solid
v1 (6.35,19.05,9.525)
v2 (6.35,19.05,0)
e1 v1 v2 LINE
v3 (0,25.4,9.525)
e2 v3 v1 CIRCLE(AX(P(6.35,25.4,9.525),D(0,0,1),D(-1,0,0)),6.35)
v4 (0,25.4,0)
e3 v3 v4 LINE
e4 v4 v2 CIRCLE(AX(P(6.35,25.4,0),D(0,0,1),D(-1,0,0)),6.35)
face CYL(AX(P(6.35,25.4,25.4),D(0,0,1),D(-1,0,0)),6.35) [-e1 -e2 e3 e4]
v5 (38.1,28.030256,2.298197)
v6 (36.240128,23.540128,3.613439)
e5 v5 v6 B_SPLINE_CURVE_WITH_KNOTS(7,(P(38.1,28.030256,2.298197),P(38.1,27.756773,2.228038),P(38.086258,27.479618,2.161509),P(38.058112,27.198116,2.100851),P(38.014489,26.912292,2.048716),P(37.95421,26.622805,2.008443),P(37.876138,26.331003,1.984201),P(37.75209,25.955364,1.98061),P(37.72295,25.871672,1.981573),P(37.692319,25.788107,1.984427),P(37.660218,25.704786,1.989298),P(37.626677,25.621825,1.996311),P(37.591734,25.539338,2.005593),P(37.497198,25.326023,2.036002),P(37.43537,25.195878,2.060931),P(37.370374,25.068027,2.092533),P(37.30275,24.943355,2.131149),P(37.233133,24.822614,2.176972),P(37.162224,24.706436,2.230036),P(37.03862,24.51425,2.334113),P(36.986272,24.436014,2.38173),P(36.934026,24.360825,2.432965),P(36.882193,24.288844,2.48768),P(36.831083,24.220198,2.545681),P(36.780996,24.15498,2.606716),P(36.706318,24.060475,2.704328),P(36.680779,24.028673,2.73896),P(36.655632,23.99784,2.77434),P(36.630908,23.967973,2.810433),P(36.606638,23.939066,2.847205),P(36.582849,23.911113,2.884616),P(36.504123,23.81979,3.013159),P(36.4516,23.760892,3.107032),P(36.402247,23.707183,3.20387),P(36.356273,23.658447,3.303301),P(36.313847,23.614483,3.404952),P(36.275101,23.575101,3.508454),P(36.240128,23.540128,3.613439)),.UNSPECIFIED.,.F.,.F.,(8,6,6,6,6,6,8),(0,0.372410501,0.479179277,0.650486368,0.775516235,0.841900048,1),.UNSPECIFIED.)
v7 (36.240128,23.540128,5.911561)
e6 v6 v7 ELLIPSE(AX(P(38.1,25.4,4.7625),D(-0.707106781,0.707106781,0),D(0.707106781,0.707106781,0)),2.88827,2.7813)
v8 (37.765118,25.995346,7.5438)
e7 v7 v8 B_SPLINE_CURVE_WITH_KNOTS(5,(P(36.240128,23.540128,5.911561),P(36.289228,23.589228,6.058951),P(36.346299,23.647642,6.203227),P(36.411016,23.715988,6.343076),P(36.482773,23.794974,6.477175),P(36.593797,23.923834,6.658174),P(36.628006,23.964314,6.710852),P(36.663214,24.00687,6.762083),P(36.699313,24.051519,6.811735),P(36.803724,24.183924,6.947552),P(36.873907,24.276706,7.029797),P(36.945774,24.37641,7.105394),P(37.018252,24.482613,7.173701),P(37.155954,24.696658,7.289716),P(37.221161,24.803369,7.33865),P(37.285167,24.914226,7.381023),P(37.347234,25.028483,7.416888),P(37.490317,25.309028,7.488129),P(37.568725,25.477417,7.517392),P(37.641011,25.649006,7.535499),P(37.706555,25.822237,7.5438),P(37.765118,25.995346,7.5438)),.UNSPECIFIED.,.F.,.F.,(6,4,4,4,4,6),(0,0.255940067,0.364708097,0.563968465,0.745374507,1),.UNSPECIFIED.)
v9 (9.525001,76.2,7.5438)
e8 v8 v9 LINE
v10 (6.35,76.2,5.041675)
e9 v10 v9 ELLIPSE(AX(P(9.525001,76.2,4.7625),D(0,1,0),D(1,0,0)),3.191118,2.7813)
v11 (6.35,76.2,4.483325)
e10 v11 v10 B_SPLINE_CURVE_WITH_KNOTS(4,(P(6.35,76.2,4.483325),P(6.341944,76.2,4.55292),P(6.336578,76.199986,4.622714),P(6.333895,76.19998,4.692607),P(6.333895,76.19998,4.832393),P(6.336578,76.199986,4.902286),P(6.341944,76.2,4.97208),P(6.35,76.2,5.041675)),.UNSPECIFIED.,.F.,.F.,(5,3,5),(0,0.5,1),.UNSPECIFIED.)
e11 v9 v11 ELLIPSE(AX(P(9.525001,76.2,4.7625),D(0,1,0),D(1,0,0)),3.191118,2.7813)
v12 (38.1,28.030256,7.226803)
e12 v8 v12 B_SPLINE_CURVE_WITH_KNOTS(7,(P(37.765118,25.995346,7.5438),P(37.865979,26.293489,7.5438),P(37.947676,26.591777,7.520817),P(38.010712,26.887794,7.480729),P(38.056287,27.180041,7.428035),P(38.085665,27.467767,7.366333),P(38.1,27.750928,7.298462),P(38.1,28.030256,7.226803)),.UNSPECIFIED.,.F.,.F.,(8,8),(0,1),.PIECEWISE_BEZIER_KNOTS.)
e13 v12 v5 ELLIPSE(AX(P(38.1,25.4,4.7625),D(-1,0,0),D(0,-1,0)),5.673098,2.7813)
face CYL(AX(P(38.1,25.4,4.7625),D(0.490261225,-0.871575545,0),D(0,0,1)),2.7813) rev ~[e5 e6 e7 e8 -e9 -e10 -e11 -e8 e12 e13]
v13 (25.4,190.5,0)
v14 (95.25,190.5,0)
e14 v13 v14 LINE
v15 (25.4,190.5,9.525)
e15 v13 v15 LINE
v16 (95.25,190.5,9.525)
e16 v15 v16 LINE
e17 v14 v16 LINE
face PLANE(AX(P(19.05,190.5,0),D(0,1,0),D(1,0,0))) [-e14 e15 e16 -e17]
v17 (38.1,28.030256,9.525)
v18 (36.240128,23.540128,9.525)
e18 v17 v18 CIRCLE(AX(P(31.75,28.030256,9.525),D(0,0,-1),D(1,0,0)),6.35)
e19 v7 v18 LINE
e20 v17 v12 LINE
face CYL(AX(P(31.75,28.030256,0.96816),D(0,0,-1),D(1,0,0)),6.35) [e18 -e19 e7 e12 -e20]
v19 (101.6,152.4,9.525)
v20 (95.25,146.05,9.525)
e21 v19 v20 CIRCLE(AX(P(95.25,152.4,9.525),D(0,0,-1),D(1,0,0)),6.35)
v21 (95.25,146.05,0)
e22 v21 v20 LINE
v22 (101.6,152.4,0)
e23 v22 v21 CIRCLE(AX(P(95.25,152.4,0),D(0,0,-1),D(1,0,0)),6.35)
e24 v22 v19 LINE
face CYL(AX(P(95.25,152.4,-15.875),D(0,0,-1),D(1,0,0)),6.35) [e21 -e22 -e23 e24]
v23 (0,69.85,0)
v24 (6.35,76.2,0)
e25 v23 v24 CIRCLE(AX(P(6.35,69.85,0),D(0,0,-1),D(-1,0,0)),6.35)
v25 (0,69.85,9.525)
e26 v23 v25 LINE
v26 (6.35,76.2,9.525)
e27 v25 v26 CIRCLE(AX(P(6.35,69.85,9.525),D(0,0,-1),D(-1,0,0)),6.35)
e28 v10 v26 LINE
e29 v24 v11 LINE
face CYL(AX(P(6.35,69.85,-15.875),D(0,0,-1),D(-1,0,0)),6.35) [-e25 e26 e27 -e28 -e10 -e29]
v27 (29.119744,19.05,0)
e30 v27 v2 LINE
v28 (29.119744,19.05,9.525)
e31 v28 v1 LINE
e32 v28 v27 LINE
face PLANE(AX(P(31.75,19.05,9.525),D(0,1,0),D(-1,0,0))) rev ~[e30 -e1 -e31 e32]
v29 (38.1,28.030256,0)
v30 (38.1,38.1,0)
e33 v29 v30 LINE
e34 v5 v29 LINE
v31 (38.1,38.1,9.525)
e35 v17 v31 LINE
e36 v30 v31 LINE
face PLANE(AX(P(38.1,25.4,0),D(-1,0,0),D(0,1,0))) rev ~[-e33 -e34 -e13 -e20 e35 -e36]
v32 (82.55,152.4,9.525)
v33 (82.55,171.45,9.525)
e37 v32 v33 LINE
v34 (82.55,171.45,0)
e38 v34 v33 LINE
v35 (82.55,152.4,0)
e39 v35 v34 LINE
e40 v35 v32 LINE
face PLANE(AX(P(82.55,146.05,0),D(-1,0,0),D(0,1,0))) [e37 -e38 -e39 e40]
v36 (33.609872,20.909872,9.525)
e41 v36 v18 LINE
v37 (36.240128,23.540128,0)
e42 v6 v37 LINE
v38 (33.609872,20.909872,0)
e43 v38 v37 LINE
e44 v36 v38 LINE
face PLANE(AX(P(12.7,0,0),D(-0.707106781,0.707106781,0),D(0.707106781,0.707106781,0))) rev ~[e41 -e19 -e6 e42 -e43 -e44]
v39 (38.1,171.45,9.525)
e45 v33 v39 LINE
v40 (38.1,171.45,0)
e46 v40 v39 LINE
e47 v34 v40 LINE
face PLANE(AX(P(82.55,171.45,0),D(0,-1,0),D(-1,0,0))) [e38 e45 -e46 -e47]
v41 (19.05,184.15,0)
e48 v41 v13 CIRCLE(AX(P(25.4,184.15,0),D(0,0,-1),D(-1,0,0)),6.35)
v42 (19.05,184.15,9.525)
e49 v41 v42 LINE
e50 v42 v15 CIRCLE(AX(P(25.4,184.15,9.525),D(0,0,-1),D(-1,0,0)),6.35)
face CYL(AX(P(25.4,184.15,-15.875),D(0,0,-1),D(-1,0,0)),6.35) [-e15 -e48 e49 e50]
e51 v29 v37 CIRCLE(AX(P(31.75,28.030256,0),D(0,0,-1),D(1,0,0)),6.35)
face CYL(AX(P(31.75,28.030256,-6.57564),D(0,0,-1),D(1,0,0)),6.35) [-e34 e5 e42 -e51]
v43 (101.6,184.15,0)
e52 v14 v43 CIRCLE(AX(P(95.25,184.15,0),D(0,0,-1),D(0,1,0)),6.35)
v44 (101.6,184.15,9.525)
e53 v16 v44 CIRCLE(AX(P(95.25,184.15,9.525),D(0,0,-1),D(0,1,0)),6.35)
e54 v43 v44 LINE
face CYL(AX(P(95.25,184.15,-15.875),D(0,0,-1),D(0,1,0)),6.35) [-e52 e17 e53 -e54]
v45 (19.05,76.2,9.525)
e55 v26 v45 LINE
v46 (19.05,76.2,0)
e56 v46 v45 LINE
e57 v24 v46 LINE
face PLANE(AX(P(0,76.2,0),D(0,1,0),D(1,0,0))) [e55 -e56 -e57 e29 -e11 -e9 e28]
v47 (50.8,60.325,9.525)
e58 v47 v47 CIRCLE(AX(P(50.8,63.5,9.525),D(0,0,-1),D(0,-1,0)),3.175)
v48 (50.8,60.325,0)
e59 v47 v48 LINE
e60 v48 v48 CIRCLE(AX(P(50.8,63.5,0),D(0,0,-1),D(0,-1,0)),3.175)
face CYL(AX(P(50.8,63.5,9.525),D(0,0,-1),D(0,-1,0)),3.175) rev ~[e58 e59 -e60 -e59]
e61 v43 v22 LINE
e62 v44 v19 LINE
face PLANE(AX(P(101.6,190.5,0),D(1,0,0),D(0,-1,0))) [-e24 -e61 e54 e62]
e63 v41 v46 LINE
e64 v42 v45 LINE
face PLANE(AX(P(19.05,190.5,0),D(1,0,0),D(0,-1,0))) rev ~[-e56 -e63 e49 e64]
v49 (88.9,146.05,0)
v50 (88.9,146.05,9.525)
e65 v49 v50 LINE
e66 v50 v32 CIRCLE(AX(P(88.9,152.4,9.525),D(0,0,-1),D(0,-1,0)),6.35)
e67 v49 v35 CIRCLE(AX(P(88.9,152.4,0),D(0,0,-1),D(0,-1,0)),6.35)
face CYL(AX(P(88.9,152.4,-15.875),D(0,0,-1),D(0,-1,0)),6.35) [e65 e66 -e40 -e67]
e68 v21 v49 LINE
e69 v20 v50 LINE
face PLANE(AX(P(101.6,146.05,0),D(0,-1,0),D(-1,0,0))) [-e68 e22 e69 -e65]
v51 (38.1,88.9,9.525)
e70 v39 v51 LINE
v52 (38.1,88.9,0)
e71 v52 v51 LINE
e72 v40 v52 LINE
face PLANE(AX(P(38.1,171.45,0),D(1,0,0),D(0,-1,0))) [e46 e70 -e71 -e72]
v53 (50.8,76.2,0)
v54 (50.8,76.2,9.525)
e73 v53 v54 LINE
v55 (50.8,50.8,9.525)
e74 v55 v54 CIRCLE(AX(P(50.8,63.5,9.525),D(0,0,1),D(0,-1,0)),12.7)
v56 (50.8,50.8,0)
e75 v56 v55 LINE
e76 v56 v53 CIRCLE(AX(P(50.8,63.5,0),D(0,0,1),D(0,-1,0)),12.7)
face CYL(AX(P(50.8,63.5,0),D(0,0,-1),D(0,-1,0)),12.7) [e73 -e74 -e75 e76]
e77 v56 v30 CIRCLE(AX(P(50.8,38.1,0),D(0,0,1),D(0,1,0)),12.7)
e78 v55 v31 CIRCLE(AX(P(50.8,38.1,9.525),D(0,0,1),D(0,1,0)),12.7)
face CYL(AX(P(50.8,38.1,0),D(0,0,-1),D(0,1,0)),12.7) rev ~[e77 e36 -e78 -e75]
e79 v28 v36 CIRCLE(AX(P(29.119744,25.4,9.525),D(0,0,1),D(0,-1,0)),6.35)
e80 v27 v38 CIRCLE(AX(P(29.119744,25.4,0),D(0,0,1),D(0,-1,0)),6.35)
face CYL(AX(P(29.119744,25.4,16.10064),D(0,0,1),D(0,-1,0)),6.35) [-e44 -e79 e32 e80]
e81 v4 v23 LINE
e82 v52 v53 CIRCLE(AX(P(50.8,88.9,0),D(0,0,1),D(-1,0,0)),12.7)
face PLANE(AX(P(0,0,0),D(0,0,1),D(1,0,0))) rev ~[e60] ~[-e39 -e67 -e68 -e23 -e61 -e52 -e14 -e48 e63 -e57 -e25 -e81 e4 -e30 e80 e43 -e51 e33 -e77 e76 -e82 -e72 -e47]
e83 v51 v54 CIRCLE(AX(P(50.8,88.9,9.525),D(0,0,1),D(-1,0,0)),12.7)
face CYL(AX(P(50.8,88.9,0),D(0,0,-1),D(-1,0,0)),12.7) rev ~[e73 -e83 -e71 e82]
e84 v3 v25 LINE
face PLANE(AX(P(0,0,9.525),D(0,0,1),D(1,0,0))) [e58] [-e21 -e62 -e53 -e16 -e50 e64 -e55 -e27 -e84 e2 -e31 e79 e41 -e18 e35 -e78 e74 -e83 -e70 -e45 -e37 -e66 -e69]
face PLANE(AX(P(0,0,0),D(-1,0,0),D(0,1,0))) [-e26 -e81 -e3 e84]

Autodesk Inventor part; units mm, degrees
ref_plane "YZ Plane" through (0, 0, 0) normal (1, 0, 0) x (0, 1, 0)
ref_plane "XZ Plane" through (0, 0, 0) normal (0, 1, 0) x (-1, 0, 0)
sketch "Sketch1" plane through (0, 0, 0) normal (0, 0, 1) x (1, 0, 0)
  line L0 (0, 0) -> (12.7, 0)
  line L1 (12.7, 0) -> (38.1, 25.4)
  line L2 (38.1, 25.4) -> (38.1, 38.1)
  arc A0 (50.8, 50.8) -> (38.1, 38.1) centre (50.8, 38.1) ccw
  line L3 (0, 0) -> (0, 76.2)
  line L4 (0, 76.2) -> (19.05, 76.2)
  line L5 (19.05, 190.5) -> (19.05, 76.2)
  line L6 (38.1, 171.45) -> (38.1, 88.9)
  arc A1 (50.8, 50.8) -> (50.8, 76.2) centre (50.8, 63.5) ccw
  arc A2 (38.1, 88.9) -> (50.8, 76.2) centre (50.8, 88.9) ccw
  line L7 (19.05, 190.5) -> (101.6, 190.5)
  line L8 (82.55, 171.45) -> (38.1, 171.45)
  line L9 (101.6, 190.5) -> (101.6, 146.05)
  line L10 (101.6, 146.05) -> (82.55, 146.05)
  line L11 (82.55, 146.05) -> (82.55, 171.45)
  dimension "d1" = 25.4
  dimension "d2" = 25.4
  dimension "d3" = 12.7
  dimension "d38" = 76.2
  dimension "d41" = 38.1
  dimension "d84" = 12.7
  dimension "d85" = 12.7
  dimension "d87" = 0
  dimension "d88" = 12.7
  dimension "d90" = 19.05
  dimension "d100" = 19.05
  dimension "d101" = 19.05
  dimension "d102" = 19.05
  dimension "d103" = 107.95
  dimension "d104" = 44.45
  dimension "d105" = 25.4
extrude "Extrusion1" add sketch "Sketch1" along normal blind 9.525
sketch "Sketch3" plane through (0, 0, 9.525) normal (0, 0, 1) x (1, 0, 0)
  line L0 (0, 76.2) -> (0, 0) projected
  line L1 (0, 0) -> (12.7, 0) projected
  arc A0 (50.8, 50.8) -> (38.1, 38.1) centre (50.8, 38.1) ccw projected
  line L2 (19.05, 76.2) -> (0, 76.2) projected
  point P0 (50.8, 63.5)
  point P1 (49.53, 54.61)
  point P2 (12.7, 82.55)
  dimension "d39" = 0
  dimension "d40" = 12.7
hole "Hole2" at (50.8, 63.5, 9.525) direction (0, 0, -1) diameter 6.35 end through all
sketch "Sketch7" plane through (0, 76.2, 0) normal (0, 1, 0) x (1, 0, 0)
  line L0 (0, 0) -> (0, -9.525) projected
  point P0 (9.525, -4.7625)
  dimension "d77" = 9.525
ref_plane "Work Plane6" through (38.1, 25.4, 0) normal (-0.4902612, 0.8715755, 0) x (0, 0, 1)
ref_plane "Work Plane5" through (38.1, 25.4, 4.7625) normal (0.8715755, 0.4902612, 0) x (-0.4902612, 0.8715755, 0)
sketch "Sketch8" plane through (38.1, 25.4, 0) normal (-0.4902612, 0.8715755, 0) x (0, 0, 1)
  line L0 (0, 0) -> (9.525, 0) projected
  circle A0 centre (4.7625, 0) radius 2.7813
  point P0 (0, -45.6597)
  dimension "d79" = 5.5626
extrude "Extrusion3" cut sketch "Sketch8" along normal through all both and the other way through all
sketch "Sketch10" plane through (0, 0, 9.525) normal (0, 0, 1) x (1, 0, 0)
  circle A0 centre (50.8, 63.5) radius 3.175 projected
  line L0 (0, 0) -> (12.7, 0) projected
  line L1 (12.7, 0) -> (38.1, 25.4) projected
  line L2 (38.1, 25.4) -> (38.1, 38.1) projected
  arc A1 (50.8, 50.8) -> (38.1, 38.1) centre (50.8, 38.1) ccw projected
  arc A2 (50.8, 50.8) -> (50.8, 76.2) centre (50.8, 63.5) ccw projected
  arc A3 (38.1, 88.9) -> (50.8, 76.2) centre (50.8, 88.9) ccw projected
  line L3 (38.1, 88.9) -> (38.1, 171.45) projected
  line L4 (19.05, 190.5) -> (19.05, 76.2) projected
  line L5 (19.05, 76.2) -> (0, 76.2) projected
  line L6 (0, 76.2) -> (0, 0) projected
  line L7 (12.7, 0) -> (38.1, 25.4) projected
  line L8 (31.75, 19.05) -> (0, 19.05)
  line L9 (38.1, 171.45) -> (82.55, 171.45) projected
  line L10 (82.55, 171.45) -> (82.55, 146.05) projected
  line L11 (82.55, 146.05) -> (101.6, 146.05) projected
  line L12 (101.6, 146.05) -> (101.6, 190.5) projected
  line L13 (101.6, 190.5) -> (19.05, 190.5) projected
  dimension "d95" = 6.35
extrude "Extrusion5" cut sketch "Sketch10" against normal through all contours L6 L8 L1 L0
fillet "Fillet6" radius 6.35 9 edges at (0, 76.2, 4.7625) (0, 19.05, 4.7625) (31.75, 19.05, 4.7625) (38.1, 25.4, 8.5344) (38.1, 25.4, 0.9906) (19.05, 190.5, 4.7625) (101.6, 190.5, 4.7625) (82.55, 146.05, 4.7625) (101.6, 146.05, 4.7625)
properties part number "CLB_079_ScissorHookV2"
